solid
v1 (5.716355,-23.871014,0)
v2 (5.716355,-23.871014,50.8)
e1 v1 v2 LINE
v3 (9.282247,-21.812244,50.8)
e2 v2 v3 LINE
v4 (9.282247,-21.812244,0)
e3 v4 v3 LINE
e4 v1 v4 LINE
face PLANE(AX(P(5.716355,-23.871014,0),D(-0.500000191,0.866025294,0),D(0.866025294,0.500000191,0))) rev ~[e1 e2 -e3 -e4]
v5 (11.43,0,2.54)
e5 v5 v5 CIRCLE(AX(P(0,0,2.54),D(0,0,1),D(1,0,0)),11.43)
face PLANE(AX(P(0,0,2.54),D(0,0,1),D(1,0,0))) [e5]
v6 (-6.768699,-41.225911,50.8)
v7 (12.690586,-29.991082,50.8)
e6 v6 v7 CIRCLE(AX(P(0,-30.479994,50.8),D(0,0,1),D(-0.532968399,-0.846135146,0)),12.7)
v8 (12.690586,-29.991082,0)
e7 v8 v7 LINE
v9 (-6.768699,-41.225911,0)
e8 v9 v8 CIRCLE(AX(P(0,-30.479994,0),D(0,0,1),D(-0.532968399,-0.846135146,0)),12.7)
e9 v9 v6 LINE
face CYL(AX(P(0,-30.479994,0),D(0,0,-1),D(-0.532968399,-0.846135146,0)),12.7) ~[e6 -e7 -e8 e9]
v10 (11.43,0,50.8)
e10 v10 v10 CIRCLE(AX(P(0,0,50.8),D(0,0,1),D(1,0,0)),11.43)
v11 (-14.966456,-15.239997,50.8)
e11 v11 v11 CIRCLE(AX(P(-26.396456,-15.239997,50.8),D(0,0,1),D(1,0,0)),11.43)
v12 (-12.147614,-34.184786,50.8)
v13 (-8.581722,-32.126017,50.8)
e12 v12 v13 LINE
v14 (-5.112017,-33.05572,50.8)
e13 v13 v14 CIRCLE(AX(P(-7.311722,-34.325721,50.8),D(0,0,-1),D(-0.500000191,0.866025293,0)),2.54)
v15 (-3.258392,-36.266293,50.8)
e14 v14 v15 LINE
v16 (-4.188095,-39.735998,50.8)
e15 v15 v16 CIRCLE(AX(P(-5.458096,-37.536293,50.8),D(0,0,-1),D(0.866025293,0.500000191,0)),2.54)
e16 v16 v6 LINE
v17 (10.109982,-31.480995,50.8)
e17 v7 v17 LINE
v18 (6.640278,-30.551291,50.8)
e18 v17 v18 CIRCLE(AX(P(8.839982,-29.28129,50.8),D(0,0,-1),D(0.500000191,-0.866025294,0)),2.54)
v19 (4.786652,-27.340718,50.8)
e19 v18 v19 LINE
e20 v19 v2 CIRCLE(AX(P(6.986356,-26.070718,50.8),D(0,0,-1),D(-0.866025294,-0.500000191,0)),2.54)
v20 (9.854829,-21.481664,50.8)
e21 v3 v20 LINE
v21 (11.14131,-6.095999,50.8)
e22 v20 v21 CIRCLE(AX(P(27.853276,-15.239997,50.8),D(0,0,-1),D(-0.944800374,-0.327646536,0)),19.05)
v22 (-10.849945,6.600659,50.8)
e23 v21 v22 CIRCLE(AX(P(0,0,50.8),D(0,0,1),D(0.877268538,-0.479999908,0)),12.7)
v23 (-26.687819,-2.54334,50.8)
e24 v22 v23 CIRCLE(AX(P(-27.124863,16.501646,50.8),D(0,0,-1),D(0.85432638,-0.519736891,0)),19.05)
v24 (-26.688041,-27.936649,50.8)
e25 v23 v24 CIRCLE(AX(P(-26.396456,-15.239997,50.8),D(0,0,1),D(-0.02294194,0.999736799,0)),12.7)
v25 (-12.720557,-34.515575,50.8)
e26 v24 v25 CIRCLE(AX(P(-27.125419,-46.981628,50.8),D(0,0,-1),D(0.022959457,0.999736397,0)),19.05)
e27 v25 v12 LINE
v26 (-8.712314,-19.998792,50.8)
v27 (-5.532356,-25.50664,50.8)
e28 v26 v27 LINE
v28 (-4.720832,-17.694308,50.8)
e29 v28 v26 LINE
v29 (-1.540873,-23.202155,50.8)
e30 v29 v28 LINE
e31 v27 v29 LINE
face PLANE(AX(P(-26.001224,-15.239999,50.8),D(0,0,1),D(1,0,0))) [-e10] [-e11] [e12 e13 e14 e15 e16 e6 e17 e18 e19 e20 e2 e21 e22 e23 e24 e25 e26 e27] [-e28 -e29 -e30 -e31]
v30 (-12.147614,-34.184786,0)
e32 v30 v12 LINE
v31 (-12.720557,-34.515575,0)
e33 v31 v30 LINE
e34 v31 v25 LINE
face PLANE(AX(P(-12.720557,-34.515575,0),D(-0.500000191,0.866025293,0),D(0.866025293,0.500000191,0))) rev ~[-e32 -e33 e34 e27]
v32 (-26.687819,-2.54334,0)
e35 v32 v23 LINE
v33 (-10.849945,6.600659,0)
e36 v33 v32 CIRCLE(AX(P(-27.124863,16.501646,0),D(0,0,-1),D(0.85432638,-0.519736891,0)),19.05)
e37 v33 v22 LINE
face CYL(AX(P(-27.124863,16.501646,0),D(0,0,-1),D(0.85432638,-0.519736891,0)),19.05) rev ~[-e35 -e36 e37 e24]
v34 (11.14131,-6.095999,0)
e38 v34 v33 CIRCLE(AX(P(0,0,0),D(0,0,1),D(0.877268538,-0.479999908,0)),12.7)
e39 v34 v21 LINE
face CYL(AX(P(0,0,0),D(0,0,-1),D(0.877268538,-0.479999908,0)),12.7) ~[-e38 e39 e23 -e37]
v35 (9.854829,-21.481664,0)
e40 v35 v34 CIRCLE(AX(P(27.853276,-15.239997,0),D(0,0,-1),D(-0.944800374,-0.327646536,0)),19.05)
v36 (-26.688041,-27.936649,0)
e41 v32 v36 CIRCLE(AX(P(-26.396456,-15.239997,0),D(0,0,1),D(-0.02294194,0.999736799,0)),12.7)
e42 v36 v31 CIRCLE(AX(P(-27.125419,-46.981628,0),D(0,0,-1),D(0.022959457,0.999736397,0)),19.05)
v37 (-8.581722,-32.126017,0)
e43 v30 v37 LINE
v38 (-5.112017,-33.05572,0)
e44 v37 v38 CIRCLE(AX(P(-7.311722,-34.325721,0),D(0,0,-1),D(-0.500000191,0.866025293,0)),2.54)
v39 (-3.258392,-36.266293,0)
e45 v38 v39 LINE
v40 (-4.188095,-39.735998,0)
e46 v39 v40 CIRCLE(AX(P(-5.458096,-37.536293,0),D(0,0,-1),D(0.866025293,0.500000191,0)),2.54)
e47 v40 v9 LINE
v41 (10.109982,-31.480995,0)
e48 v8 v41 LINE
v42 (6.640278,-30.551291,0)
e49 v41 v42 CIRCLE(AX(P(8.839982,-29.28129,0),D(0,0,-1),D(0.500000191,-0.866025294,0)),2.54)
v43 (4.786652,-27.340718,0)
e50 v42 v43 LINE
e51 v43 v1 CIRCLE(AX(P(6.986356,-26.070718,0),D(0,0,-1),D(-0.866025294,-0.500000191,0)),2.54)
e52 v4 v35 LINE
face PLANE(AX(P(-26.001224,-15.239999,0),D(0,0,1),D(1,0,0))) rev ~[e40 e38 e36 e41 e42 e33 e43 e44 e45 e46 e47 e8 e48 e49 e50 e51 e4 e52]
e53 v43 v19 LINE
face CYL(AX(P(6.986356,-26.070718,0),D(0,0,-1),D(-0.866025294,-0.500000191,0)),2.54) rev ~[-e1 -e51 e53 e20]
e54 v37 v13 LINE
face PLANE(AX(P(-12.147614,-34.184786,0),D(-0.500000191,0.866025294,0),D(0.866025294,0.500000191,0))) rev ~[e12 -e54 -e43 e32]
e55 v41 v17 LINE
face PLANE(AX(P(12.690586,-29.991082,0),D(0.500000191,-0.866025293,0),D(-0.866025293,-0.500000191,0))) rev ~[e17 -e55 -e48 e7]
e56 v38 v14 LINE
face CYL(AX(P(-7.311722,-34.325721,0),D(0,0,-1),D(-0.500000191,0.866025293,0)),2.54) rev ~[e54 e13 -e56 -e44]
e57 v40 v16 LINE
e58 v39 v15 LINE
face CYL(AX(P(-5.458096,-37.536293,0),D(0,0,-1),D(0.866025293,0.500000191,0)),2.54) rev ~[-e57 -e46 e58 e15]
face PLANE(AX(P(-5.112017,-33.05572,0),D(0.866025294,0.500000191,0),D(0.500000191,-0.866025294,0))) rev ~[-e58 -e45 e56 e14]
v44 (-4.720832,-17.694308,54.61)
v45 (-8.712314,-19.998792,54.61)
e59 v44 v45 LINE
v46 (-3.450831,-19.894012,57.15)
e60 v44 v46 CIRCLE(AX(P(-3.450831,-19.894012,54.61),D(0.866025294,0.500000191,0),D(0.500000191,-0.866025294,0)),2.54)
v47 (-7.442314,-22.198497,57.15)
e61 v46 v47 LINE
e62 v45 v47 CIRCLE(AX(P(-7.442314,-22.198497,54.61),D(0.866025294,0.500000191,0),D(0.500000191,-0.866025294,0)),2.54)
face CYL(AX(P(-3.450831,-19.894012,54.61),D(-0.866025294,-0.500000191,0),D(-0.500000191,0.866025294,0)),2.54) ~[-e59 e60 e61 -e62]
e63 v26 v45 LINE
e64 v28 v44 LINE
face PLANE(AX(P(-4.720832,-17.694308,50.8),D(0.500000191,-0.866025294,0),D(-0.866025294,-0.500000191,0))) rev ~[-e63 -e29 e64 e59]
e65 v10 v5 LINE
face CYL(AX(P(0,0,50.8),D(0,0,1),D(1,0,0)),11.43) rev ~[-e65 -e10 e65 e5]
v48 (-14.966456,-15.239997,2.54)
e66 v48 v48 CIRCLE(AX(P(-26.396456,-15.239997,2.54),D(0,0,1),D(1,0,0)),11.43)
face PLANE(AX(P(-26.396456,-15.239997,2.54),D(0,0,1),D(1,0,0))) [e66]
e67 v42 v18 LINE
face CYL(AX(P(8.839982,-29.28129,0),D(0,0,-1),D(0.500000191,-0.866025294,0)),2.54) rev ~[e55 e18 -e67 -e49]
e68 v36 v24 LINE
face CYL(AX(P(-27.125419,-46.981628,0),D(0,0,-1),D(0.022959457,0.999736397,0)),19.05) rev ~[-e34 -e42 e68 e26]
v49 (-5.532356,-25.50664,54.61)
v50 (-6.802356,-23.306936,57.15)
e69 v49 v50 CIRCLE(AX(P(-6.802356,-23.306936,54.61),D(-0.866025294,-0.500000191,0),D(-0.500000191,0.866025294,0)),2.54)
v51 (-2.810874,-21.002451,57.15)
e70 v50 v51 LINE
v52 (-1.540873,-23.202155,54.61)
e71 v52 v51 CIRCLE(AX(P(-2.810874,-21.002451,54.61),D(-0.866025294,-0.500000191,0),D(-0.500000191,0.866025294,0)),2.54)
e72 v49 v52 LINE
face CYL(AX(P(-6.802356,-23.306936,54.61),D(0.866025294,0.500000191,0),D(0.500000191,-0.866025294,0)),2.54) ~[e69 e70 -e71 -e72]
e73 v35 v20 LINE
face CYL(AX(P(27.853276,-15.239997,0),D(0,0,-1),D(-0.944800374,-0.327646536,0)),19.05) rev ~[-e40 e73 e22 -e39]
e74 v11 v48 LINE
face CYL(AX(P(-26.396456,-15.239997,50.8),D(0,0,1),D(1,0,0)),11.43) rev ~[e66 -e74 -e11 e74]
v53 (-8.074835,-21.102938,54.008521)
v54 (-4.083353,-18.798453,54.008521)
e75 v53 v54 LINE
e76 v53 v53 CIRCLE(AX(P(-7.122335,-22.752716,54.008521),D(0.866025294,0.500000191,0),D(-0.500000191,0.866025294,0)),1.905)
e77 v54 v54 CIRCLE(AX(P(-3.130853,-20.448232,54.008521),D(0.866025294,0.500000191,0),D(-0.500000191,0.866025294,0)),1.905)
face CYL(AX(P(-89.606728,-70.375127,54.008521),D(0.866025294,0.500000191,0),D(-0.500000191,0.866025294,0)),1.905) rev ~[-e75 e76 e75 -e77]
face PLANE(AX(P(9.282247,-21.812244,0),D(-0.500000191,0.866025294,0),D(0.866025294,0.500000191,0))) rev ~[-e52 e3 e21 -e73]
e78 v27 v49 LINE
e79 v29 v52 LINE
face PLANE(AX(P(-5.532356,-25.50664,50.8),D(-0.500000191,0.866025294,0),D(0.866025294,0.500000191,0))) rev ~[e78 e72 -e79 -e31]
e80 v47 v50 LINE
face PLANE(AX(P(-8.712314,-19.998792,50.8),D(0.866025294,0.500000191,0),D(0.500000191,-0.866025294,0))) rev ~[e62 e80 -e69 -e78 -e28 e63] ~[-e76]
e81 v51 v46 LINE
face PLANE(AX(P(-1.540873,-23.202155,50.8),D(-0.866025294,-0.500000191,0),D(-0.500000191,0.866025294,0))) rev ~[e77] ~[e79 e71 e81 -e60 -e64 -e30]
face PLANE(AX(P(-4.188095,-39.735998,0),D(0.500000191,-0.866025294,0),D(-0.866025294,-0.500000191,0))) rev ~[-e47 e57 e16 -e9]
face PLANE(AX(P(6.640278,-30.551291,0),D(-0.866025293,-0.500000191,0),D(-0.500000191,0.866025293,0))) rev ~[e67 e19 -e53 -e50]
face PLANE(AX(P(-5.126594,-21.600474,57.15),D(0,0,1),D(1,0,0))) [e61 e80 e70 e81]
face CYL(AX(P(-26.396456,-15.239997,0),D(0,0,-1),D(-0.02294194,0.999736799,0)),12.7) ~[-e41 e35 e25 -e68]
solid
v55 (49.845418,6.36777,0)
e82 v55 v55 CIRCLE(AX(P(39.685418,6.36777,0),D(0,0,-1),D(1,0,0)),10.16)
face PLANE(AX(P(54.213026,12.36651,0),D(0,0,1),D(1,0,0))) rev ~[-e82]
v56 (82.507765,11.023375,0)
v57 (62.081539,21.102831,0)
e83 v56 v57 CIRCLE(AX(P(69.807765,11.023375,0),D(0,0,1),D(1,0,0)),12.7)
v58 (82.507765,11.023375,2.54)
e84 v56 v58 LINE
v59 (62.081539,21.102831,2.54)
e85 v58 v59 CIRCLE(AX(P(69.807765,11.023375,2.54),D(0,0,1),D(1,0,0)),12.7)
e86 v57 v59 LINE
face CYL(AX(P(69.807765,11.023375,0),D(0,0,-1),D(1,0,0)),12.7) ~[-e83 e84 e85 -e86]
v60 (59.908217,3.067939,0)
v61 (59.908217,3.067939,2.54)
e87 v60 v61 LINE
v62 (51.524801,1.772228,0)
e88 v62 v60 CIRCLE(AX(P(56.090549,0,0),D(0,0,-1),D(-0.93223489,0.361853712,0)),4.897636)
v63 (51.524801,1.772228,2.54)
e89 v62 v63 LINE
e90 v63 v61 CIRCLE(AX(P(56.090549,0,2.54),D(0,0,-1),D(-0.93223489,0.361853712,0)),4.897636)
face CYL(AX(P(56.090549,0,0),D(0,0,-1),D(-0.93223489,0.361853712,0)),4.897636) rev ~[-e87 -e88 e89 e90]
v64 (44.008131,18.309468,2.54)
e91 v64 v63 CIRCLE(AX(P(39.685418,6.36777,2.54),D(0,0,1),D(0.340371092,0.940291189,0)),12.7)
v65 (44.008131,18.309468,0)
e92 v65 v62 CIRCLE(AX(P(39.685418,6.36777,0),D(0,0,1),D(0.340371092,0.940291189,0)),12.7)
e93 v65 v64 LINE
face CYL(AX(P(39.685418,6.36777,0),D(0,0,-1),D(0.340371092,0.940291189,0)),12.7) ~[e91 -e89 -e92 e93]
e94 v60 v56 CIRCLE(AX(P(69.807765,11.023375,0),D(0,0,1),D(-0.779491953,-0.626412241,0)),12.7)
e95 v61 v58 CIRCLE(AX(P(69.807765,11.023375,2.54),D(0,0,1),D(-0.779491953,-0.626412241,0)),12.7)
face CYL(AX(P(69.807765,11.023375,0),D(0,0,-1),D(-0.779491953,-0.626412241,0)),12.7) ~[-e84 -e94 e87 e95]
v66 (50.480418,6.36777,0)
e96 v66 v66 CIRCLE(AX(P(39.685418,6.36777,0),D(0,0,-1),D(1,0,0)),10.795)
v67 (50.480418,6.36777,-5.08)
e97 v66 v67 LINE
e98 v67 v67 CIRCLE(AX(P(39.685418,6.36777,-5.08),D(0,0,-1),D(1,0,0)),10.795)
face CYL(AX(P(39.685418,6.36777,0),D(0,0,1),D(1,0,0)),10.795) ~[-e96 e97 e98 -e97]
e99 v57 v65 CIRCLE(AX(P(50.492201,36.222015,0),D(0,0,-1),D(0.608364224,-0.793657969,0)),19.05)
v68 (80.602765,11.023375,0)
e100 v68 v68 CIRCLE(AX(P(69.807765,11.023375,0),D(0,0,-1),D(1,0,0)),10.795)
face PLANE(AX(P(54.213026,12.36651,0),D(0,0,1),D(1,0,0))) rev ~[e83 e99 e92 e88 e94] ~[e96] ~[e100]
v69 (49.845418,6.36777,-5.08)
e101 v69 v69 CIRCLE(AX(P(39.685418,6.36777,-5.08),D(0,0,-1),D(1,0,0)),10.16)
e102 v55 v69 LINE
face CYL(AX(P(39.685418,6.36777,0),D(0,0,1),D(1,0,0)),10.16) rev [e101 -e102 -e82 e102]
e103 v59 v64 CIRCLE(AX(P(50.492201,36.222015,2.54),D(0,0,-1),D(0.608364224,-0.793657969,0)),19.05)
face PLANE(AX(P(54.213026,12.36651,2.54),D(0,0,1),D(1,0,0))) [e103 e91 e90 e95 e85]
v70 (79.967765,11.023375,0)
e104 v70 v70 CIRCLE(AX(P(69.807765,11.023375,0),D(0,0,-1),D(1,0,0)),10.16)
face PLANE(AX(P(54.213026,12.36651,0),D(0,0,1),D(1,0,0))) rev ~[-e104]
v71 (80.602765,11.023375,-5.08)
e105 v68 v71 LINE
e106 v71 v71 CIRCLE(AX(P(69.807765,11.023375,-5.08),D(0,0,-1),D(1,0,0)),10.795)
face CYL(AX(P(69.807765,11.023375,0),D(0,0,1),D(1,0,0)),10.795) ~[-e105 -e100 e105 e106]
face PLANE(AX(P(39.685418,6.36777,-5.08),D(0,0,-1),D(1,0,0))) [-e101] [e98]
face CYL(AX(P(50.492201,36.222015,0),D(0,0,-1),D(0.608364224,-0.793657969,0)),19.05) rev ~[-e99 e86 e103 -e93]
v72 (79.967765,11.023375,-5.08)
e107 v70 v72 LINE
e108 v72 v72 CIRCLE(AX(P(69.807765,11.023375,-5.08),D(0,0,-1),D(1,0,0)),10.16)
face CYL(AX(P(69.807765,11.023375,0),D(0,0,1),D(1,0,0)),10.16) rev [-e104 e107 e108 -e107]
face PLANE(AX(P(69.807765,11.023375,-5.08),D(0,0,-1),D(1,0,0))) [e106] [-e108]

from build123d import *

# Parameters (mm, degrees)
F0_R     = 11.43
F1_DEPTH = 50.8
F2_R     = 11.43
F3_DEPTH = 48.26
F5_DEPTH = 6.35
F6_R     = 11.303
F7_DEPTH = 2.54
F8_R     = 10.795
F8_R_2   = 10.16
F9_DEPTH = 5.08
F10_R    = 2.54
F12_D    = 3.81


# Not quite as in the source:
# - a feature names something its author has since deleted; it is built from what else it names


with BuildPart() as f1:
    # F0 (on Top) → F1 (new body)
    with BuildSketch(Plane.XY):
        with BuildLine():
            ThreePointArc((-26.6880410914, -27.9366493299), (-17.5198893886, -24.3227590811), (-13.696455988, -15.239997089))
            ThreePointArc((-13.696455988, -15.239997089), (-17.5198098165, -6.1573128632), (-26.687818625, -2.5433397409))
            ThreePointArc((-26.687818625, -2.5433397409), (-39.0964559875, -15.2398858265), (-26.6880410914, -27.9366493299))
        make_face()
        with Locations((-26.396455988, -15.239997089)):
            Circle(F0_R, mode=Mode.SUBTRACT)
        with BuildLine():
            ThreePointArc((-6.3500025059, -19.4814729967), (-11.2476380181, -19.4814737375), (-13.696455988, -15.239997089))
            ThreePointArc((-13.696455988, -15.239997089), (-17.5198893886, -24.3227590811), (-26.6880410914, -27.9366493299))
            ThreePointArc((-26.6880410914, -27.9366493299), (-19.0079324117, -29.7476810857), (-12.7205570443, -34.5155754156))
            Line((-12.7205570443, -34.5155754156), (-12.1476135977, -34.1847861939))
            ThreePointArc((-12.1476135977, -34.1847861939), (-11.8147071535, -25.8213790536), (-6.3500025059, -19.4814729967))
        make_face()
        with BuildLine():
            ThreePointArc((-26.687818625, -2.5433397409), (-17.5198098165, -6.1573128632), (-13.696455988, -15.239997089))
            ThreePointArc((-13.696455988, -15.239997089), (-11.2476381845, -10.9985205365), (-6.3500028388, -10.9985209891))
            ThreePointArc((-6.3500028388, -10.9985209891), (-12.3041591128, -3.1460560273), (-10.8499450322, 6.6006585125))
            ThreePointArc((-10.8499450322, 6.6006585125), (-17.5998643999, 0.0038612886), (-26.687818625, -2.5433397409))
        make_face()
        with BuildLine():
            ThreePointArc((-6.3500028388, -10.9985209891), (-11.2476381845, -10.9985205365), (-13.696455988, -15.239997089))
            ThreePointArc((-13.696455988, -15.239997089), (-11.2476380181, -19.4814737375), (-6.3500025059, -19.4814729967))
            ThreePointArc((-6.3500025059, -19.4814729967), (-4.557344255, -17.6888142035), (-3.9011858191, -15.239997089))
            ThreePointArc((-3.9011858191, -15.239997089), (-4.5573443511, -12.791179808), (-6.3500028388, -10.9985209891))
        make_face()
        with BuildLine():
            ThreePointArc((-10.8499450322, 6.6006585125), (-12.3041591128, -3.1460560273), (-6.3500028388, -10.9985209891))
            ThreePointArc((-6.3500028388, -10.9985209891), (3.4275119235, -12.2287432721), (11.1413104344, -6.0959988356))
            ThreePointArc((11.1413104344, -6.0959988356), (12.3041586977, -3.1460576507), (12.7, 0))
            ThreePointArc((12.7, 0), (3.4275135369, 12.2287428199), (-10.8499450322, 6.6006585125))
        make_face()
        Circle(F0_R, mode=Mode.SUBTRACT)
        with BuildLine():
            ThreePointArc((11.1413104344, -6.0959988356), (3.4275119235, -12.2287432721), (-6.3500028388, -10.9985209891))
            ThreePointArc((-6.3500028388, -10.9985209891), (-4.5573443511, -12.791179808), (-3.9011858191, -15.239997089))
            ThreePointArc((-3.9011858191, -15.239997089), (-4.557344255, -17.6888142035), (-6.3500025059, -19.4814729967))
            ThreePointArc((-6.3500025059, -19.4814729967), (1.8728689002, -17.9188492428), (9.2822469769, -21.8122441204))
            Line((9.2822469769, -21.8122441204), (9.8548289521, -21.4816635945))
            ThreePointArc((9.8548289521, -21.4816635945), (8.8695235868, -13.6526593666), (11.1413104344, -6.0959988356))
        make_face()
        with BuildLine():
            ThreePointArc((9.2822469769, -21.8122441204), (1.8728689002, -17.9188492428), (-6.3500025059, -19.4814729967))
            ThreePointArc((-6.3500025059, -19.4814729967), (-11.8147071535, -25.8213790536), (-12.1476135977, -34.1847861939))
            Line((-12.1476135977, -34.1847861939), (-8.5817221083, -32.126016734))
            ThreePointArc((-8.5817221083, -32.126016734), (-6.6543217897, -31.8722692357), (-5.1120173776, -33.0557204943))
            Line((-5.1120173776, -33.0557204943), (-3.2583915378, -36.2662929918))
            ThreePointArc((-3.2583915378, -36.2662929918), (-3.0046440395, -38.1936933104), (-4.1880952981, -39.7359977225))
            Line((-4.1880952981, -39.7359977225), (-6.7686986704, -41.225910533))
            ThreePointArc((-6.7686986704, -41.225910533), (6.3500024258, -41.4785154055), (12.6905856699, -29.9910817583))
            Line((12.6905856699, -29.9910817583), (10.1099822977, -31.4809945689))
            ThreePointArc((10.1099822977, -31.4809945689), (8.1825819791, -31.7347420671), (6.640277567, -30.5512908085))
            Line((6.640277567, -30.5512908085), (4.7866517271, -27.340718311))
            ThreePointArc((4.7866517271, -27.340718311), (4.5329042289, -25.4133179924), (5.7163554875, -23.8710135804))
            Line((5.7163554875, -23.8710135804), (9.2822469769, -21.8122441204))
        make_face()
        Circle(F0_R)
        with Locations((-26.396455988, -15.239997089)):
            Circle(F0_R)
    extrude(amount=F1_DEPTH)

    # F2 (on face) → F3 (cut)
    with BuildSketch(Plane.XY.offset(50.8)):
        Circle(F2_R)
        with Locations((-26.396455988, -15.239997089)):
            Circle(F2_R)
    extrude(amount=-F3_DEPTH, mode=Mode.SUBTRACT)

    # F4 (on face) → F5 (join)
    with BuildSketch(Plane.XY.offset(50.8)):
        Polygon((-4.7208319521, -17.694307821), (-8.7123144021, -19.9987924618), (-5.5323556007, -25.5066398663), (-1.5408731507, -23.2021552255), align=None)
    extrude(amount=F5_DEPTH)

    # F10
    f10_edges = [f1.edges().sort_by_distance(p)[0] for p in [
        (-3.536614, -24.354398, 57.15),
        (-6.716573, -18.84655, 57.15),
    ]]
    fillet(f10_edges, radius=F10_R)

    # F12 (through all)
    with Locations(Plane(origin=(-15.1939675014, -8.7722456953, 0), x_dir=(0.500000191, -0.8660252935, 0), z_dir=(-0.8660252935, -0.500000191, 0))):
        with Locations((16.1432588328, 54.0085211396)):
            Hole(F12_D / 2)


with BuildPart() as f7:
    # F6 (on Top) → F7 (new body)
    with BuildSketch(Plane.XY):
        with BuildLine():
            ThreePointArc((44.0081312178, 18.3094680903), (50.0822556943, 13.6613132529), (52.3854183536, 6.367769991))
            ThreePointArc((52.3854183536, 6.367769991), (52.1684100917, 4.0300537406), (51.5248014611, 1.772227843))
            ThreePointArc((51.5248014611, 1.772227843), (55.3424694696, 4.8401671142), (59.9082168201, 3.0679392713))
            ThreePointArc((59.9082168201, 3.0679392713), (57.1989858639, 12.5428148688), (62.0815389765, 21.1028309357))
            ThreePointArc((62.0815389765, 21.1028309357), (53.401953478, 17.3955488238), (44.0081312178, 18.3094680903))
        make_face()
        with BuildLine():
            ThreePointArc((51.5248014611, 1.772227843), (52.1684100917, 4.0300537406), (52.3854183536, 6.367769991))
            ThreePointArc((52.3854183536, 6.367769991), (50.0822556943, 13.6613132529), (44.0081312178, 18.3094680903))
            ThreePointArc((44.0081312178, 18.3094680903), (28.1236963669, 1.1126215915), (51.5248014611, 1.772227843))
        make_face()
        with Locations((39.6854183536, 6.367769991)):
            Circle(F6_R, mode=Mode.SUBTRACT)
        with Locations((39.6854183536, 6.367769991)):
            Circle(F6_R)
        with BuildLine():
            ThreePointArc((82.5077646182, 11.0233747334), (75.4276816261, 22.4122523263), (62.0815389765, 21.1028309357))
            ThreePointArc((62.0815389765, 21.1028309357), (57.1989858639, 12.5428148688), (59.9082168201, 3.0679392713))
            ThreePointArc((59.9082168201, 3.0679392713), (74.0247388275, -0.9560713522), (82.5077646182, 11.0233747334))
        make_face()
        with Locations((69.8077646182, 11.0233747334)):
            Circle(F6_R, mode=Mode.SUBTRACT)
        with Locations((69.8077646182, 11.0233747334)):
            Circle(F6_R)
    extrude(amount=F7_DEPTH)

    # F8 (on face) → F9 (join)
    with BuildSketch(Plane(origin=(0, 0, 0), x_dir=(1, 0, 0), z_dir=(0, 0, -1))):
        with Locations((39.6854183536, -6.367769991)):
            Circle(F8_R)
        with Locations((39.6854183536, -6.367769991)):
            Circle(F8_R_2, mode=Mode.SUBTRACT)
        with Locations((69.8077646182, -11.0233747334)):
            Circle(F8_R)
        with Locations((69.8077646182, -11.0233747334)):
            Circle(F8_R_2, mode=Mode.SUBTRACT)
    extrude(amount=F9_DEPTH)


solid = Compound([f1.part, f7.part])
